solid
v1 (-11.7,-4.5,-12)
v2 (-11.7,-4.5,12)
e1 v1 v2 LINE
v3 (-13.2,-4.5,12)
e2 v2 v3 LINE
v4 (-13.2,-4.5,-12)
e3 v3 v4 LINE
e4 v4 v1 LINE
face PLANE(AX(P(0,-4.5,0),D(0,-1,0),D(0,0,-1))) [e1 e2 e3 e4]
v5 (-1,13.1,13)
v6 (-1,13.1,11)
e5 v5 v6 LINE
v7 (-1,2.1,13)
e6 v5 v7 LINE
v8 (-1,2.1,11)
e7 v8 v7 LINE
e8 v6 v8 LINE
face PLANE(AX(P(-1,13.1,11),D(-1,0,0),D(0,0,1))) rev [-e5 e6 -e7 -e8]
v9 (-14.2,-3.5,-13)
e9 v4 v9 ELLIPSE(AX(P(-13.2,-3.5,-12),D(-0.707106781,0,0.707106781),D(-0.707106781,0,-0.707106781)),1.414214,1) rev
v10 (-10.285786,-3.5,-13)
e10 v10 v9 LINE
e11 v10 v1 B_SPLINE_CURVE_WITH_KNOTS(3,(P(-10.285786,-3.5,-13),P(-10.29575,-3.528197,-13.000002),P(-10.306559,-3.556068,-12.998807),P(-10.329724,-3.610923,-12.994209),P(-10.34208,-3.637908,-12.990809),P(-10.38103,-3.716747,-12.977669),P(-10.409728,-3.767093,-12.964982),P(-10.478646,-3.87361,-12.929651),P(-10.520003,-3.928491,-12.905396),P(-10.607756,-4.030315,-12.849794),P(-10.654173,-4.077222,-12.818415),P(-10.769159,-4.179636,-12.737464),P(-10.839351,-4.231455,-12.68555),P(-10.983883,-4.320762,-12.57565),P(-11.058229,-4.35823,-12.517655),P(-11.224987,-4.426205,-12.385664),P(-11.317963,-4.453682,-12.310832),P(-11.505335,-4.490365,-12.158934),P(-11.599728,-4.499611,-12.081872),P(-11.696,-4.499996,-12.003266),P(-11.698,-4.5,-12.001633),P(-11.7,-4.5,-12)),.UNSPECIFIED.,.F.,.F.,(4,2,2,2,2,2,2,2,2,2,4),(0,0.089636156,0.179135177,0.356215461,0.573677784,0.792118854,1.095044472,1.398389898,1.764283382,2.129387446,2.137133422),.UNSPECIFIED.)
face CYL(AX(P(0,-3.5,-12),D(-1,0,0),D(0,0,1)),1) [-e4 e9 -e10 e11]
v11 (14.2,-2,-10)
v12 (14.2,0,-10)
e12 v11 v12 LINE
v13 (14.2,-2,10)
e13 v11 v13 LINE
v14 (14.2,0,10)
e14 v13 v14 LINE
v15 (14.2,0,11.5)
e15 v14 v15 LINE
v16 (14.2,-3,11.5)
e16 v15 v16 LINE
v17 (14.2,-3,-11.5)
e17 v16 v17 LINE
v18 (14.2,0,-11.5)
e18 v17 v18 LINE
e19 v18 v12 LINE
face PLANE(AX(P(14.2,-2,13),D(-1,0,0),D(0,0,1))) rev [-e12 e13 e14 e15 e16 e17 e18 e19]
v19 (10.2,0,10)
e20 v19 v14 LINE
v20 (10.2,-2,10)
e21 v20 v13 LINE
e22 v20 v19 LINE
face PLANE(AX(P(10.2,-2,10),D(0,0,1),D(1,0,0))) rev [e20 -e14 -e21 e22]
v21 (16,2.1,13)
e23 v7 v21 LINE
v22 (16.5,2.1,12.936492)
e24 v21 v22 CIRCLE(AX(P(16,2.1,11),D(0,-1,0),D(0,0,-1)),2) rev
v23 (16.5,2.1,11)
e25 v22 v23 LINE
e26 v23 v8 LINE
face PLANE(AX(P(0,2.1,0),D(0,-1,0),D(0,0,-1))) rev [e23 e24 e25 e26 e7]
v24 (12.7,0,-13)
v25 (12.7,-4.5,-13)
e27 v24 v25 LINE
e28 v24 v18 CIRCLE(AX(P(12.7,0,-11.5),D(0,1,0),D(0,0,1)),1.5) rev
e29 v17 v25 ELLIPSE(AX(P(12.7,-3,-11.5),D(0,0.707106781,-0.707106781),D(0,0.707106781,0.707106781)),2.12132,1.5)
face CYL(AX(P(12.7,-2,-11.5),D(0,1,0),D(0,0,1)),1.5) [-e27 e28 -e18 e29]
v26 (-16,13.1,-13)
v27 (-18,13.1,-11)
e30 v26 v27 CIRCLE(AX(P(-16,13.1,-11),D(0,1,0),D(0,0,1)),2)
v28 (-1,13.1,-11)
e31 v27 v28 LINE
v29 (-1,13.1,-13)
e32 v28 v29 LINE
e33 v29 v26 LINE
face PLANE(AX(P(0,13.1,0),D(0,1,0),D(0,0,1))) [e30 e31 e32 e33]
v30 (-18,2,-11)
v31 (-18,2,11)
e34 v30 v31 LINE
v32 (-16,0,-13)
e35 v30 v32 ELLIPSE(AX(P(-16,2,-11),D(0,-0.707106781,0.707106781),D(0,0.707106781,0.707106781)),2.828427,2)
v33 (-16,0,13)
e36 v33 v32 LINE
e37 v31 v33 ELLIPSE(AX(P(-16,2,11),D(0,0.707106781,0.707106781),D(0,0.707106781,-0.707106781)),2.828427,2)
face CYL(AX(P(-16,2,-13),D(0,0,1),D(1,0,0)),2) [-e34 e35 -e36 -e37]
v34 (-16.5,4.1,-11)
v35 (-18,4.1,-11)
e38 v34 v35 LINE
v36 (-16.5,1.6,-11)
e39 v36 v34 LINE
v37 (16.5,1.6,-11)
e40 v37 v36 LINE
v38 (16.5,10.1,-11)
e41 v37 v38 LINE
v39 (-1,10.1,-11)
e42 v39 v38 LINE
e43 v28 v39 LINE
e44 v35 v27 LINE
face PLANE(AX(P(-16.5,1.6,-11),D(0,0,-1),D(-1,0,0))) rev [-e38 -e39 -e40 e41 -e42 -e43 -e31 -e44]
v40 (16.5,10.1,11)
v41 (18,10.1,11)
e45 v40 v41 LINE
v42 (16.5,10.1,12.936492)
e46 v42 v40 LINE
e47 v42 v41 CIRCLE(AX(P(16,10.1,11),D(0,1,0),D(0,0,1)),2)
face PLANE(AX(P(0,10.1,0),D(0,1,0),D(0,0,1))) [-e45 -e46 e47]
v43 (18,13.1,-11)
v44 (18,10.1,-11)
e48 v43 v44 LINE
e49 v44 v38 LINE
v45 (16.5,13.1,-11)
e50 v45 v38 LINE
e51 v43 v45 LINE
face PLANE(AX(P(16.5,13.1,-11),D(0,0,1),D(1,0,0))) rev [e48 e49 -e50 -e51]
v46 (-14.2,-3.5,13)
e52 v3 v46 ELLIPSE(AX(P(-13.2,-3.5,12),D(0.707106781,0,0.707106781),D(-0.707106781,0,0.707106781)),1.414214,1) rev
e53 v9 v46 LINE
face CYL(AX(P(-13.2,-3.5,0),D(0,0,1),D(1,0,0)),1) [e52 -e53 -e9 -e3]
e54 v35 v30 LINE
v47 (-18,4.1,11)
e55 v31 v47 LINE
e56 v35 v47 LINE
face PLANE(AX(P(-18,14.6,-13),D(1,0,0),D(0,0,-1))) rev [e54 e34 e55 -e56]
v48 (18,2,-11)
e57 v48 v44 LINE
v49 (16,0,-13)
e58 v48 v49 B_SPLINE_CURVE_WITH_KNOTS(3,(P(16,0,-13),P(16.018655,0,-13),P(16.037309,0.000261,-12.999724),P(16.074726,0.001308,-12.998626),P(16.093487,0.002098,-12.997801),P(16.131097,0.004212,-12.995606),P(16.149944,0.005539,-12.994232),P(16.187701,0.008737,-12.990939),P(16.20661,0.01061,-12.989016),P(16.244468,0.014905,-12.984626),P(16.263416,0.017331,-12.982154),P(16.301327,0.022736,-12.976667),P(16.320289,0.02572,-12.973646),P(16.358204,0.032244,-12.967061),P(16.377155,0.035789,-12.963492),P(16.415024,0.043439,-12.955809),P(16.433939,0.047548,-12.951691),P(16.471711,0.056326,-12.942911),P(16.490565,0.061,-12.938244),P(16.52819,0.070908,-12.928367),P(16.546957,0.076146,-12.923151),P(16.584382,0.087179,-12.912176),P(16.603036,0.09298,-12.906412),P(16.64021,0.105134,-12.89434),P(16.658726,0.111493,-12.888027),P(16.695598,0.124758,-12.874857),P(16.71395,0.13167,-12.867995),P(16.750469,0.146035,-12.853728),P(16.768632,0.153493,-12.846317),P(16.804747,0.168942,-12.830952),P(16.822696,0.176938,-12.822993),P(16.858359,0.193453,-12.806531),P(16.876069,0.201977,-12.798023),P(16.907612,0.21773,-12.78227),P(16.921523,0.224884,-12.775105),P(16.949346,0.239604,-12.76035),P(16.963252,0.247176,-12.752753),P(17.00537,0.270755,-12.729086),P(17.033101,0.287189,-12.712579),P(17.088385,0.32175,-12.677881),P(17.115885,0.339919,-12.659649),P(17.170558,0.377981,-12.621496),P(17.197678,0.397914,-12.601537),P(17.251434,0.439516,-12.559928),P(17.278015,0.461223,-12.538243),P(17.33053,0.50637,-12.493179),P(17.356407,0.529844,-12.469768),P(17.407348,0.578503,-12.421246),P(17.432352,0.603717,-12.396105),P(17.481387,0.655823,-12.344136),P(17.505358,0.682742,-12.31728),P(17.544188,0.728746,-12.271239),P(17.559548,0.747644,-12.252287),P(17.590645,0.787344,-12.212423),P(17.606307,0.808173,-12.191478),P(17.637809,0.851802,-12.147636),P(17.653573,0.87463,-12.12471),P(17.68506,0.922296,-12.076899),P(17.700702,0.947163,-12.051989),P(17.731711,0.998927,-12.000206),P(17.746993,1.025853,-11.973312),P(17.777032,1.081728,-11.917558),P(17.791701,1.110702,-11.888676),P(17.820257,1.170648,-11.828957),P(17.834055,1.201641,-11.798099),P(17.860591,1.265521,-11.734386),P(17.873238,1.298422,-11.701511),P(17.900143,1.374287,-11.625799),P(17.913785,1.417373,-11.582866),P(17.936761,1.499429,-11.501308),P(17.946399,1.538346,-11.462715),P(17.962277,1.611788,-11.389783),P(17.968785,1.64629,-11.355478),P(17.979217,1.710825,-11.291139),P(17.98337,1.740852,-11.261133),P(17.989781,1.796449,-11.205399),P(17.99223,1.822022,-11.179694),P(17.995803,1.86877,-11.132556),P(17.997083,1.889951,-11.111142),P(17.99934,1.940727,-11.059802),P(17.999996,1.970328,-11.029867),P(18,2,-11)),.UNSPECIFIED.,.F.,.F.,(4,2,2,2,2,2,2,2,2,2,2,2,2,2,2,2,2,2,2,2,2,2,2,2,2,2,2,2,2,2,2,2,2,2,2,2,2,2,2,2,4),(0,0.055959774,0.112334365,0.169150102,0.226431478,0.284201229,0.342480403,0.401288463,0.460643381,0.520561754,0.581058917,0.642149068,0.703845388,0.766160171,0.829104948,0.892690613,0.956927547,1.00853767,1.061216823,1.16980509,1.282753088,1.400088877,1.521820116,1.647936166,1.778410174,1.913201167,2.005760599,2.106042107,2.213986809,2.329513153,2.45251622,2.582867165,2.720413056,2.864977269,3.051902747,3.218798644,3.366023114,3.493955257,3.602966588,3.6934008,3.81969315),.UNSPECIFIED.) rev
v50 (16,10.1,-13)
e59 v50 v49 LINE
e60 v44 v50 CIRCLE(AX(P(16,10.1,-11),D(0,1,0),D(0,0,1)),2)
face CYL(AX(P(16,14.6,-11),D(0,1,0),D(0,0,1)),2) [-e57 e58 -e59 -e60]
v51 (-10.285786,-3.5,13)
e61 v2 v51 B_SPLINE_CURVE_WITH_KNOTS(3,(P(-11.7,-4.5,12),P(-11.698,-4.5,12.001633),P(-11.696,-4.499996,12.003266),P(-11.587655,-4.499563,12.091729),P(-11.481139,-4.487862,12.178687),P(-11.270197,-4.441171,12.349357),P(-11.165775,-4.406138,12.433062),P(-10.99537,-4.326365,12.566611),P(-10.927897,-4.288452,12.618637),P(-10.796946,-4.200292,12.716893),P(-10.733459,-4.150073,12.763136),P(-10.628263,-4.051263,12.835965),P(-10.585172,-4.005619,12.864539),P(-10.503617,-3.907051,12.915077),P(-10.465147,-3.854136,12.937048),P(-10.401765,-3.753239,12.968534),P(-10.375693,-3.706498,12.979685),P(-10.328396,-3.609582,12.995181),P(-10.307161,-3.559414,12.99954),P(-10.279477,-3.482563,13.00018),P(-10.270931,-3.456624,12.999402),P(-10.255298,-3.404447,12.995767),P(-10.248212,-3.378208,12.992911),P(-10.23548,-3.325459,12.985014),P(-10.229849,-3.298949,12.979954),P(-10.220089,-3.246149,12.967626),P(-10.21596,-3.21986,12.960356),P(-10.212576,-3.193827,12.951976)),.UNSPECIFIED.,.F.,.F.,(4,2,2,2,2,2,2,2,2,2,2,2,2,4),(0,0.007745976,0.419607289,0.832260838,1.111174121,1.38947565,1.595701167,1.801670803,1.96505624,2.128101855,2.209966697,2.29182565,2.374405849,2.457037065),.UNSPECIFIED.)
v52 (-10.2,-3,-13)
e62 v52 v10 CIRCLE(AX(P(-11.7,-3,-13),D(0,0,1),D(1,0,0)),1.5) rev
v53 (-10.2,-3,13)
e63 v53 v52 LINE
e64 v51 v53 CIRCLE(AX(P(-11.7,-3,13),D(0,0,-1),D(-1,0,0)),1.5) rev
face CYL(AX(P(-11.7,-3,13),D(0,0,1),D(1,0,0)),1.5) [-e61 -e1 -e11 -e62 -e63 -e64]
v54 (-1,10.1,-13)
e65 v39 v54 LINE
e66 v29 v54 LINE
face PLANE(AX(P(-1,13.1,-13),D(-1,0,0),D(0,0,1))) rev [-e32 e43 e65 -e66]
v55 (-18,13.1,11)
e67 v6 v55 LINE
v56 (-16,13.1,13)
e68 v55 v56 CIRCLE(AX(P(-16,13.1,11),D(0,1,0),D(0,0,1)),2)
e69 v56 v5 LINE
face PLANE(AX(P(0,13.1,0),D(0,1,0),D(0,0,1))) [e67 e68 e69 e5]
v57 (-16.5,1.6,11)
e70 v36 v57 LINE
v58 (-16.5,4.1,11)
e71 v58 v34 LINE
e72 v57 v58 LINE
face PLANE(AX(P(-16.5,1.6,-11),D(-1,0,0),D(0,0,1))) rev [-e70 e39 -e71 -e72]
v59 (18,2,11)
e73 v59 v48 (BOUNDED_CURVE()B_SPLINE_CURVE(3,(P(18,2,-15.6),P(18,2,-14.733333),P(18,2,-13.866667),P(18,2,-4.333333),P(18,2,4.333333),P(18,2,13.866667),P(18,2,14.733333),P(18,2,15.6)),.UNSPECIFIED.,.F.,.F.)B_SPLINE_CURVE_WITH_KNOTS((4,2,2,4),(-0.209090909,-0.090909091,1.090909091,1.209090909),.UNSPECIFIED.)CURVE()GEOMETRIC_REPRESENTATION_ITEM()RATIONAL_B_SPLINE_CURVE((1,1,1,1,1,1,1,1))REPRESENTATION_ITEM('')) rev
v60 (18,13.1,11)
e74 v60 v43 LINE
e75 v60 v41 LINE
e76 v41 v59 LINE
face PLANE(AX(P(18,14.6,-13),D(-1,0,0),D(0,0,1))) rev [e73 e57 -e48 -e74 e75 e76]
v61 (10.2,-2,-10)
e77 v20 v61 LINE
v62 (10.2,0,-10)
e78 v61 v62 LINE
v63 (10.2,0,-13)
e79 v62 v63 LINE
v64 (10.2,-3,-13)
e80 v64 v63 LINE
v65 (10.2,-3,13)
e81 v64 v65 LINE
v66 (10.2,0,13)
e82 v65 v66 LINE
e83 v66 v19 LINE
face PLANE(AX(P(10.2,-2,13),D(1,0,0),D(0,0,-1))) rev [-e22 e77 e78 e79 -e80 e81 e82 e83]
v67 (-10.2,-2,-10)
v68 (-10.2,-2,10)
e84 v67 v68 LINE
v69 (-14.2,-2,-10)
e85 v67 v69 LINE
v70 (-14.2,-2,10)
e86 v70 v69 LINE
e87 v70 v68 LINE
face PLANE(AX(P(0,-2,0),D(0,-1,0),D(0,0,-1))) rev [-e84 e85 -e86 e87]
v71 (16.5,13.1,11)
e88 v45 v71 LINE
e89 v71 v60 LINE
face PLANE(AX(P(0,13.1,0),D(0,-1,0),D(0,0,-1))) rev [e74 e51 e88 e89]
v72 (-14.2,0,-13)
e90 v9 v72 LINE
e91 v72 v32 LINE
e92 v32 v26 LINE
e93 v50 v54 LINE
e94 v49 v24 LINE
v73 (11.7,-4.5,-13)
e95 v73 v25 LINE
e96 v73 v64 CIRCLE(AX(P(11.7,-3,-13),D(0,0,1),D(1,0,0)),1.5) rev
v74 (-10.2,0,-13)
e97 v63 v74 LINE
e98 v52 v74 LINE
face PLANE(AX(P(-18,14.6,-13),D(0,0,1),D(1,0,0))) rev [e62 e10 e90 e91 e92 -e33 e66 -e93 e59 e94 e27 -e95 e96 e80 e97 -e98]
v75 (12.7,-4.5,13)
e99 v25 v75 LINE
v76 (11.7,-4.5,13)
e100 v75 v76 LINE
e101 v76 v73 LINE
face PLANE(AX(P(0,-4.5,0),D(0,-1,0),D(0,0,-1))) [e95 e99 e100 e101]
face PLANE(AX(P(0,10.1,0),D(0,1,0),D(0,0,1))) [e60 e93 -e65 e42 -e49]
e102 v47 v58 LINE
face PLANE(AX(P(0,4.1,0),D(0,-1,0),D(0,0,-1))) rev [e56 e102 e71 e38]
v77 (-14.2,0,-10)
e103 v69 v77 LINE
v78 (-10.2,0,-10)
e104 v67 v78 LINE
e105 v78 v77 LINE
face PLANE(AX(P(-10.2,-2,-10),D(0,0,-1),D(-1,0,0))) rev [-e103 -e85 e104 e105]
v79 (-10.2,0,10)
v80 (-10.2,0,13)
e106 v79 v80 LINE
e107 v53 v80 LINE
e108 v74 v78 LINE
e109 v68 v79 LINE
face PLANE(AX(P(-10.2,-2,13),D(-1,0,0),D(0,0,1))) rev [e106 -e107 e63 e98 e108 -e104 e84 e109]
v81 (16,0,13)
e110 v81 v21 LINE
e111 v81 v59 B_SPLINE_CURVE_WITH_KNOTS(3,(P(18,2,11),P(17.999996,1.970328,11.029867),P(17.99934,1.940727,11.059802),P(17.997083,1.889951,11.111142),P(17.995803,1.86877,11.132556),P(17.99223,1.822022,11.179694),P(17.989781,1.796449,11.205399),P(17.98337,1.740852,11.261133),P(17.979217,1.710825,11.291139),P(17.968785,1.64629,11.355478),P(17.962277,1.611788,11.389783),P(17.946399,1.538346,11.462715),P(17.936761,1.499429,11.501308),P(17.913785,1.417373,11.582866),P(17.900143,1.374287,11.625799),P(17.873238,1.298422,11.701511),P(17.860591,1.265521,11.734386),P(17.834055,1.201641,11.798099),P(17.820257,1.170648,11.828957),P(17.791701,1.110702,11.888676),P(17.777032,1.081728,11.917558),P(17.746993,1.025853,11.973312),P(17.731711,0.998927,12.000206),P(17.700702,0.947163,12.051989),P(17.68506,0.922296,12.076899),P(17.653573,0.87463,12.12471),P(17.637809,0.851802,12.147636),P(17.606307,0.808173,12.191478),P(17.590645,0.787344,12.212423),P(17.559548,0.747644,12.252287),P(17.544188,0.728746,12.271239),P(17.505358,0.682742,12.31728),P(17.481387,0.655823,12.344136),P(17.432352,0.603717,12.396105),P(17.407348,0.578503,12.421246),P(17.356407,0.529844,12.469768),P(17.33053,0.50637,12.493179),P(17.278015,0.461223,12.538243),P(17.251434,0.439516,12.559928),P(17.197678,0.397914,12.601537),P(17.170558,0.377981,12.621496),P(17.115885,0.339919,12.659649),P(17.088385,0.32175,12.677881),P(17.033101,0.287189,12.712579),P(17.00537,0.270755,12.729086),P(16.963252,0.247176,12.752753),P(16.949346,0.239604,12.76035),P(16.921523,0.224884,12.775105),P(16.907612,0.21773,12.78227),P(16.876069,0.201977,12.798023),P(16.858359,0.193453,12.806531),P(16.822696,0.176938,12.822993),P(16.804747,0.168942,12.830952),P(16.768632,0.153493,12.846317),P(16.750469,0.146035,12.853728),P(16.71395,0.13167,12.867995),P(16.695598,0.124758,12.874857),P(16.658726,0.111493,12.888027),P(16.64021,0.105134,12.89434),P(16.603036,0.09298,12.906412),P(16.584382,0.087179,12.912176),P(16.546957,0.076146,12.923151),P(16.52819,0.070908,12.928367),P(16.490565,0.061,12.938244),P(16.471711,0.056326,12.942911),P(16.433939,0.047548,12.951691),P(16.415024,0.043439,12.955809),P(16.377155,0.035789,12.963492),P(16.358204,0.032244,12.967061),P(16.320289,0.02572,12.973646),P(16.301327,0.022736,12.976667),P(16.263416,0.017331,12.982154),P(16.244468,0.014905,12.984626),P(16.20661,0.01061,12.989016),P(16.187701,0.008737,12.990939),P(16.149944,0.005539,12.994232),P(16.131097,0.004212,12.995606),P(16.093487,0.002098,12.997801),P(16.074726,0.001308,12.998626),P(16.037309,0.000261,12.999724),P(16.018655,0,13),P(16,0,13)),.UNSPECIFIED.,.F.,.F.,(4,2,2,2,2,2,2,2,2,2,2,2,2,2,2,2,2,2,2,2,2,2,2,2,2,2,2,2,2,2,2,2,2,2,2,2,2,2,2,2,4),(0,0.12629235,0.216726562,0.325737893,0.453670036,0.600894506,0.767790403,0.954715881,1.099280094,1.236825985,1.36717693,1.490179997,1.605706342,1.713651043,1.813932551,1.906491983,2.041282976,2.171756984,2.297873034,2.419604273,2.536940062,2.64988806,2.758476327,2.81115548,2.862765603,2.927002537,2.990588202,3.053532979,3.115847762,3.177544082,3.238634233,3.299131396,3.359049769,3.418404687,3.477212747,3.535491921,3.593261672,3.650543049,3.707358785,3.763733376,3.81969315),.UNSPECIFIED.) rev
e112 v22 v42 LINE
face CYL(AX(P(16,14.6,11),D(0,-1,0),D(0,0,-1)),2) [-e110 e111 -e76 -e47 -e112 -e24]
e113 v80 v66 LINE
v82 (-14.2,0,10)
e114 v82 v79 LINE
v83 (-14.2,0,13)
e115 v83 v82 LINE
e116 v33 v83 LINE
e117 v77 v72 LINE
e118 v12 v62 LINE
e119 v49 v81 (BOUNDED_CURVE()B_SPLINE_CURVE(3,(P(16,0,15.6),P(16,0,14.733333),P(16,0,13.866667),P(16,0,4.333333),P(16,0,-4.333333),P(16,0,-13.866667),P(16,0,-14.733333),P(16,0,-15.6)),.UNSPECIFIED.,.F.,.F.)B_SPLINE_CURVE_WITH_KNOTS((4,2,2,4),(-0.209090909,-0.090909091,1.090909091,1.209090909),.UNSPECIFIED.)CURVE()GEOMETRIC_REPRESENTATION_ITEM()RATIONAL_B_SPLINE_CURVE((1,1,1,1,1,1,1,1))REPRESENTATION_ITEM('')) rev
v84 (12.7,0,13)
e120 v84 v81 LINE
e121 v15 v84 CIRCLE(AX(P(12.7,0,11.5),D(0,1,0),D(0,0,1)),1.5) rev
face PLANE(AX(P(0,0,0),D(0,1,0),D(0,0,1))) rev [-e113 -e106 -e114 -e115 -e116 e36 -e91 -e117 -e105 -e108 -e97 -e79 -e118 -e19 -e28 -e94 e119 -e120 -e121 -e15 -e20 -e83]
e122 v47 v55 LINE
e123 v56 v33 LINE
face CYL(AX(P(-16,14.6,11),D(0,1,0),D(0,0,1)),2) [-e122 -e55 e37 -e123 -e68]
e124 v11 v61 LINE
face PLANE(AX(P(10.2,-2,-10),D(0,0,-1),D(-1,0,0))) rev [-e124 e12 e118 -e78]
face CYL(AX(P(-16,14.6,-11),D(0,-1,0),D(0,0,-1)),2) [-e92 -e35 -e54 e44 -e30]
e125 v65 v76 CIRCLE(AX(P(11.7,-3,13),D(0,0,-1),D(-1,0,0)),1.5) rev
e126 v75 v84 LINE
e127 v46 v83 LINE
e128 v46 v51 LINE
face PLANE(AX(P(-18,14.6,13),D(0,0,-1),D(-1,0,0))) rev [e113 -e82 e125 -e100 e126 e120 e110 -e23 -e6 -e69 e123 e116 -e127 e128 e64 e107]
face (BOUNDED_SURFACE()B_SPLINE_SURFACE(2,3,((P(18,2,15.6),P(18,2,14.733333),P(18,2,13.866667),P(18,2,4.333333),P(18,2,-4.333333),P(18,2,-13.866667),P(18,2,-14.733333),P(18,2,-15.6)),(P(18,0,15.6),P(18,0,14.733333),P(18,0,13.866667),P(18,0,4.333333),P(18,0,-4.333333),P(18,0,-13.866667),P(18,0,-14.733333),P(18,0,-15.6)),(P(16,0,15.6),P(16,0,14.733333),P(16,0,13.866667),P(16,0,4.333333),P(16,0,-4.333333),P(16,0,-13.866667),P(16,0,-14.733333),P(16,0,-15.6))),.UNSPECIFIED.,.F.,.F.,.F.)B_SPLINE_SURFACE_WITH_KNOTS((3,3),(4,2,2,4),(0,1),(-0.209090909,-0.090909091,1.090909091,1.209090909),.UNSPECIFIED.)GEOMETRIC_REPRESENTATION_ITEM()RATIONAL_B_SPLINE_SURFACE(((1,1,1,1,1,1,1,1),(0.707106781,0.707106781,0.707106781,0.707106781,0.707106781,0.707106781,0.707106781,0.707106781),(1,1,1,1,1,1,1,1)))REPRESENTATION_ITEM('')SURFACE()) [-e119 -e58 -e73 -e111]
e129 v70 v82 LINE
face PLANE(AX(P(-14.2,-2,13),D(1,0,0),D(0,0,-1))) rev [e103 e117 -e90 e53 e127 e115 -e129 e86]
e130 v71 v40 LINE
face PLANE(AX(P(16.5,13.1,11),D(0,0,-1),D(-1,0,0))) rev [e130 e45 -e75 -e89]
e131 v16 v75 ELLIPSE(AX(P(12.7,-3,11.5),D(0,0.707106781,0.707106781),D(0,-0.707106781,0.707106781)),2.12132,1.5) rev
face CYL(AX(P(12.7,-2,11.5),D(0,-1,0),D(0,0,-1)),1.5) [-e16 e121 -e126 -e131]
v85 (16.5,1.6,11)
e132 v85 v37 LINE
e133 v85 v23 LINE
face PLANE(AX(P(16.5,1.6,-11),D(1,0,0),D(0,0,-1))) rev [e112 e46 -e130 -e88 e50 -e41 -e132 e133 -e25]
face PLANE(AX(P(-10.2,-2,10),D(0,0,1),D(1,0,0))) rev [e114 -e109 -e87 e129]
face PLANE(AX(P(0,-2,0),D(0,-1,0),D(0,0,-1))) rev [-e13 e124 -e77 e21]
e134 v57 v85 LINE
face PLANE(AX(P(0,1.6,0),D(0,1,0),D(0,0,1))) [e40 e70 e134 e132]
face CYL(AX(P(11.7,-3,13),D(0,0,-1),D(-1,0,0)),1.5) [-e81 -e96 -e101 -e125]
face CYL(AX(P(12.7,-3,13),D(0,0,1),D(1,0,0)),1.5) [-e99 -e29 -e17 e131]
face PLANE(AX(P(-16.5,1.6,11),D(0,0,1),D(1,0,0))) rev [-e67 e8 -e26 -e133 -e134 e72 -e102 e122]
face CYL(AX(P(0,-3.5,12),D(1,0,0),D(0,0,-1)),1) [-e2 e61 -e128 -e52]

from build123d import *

# Parameters (mm, degrees)
SKETCH_1_W          = 36
SKETCH_1_H          = 26
EXTRUDE_1_DEPTH     = 14.6
SKETCH_2_W          = 33
SKETCH_2_H          = 22
CUT_EXTRUDE_1_DEPTH = 13
SKETCH_3_W          = 36
SKETCH_3_H          = 26
CUT_EXTRUDE_2_DEPTH = 4.5
SKETCH_4_W          = 1.5
SKETCH_4_H          = 22
CUT_EXTRUDE_3_DEPTH = 6
SKETCH_7_W          = 17
SKETCH_7_H          = 2
SKETCH_7_W_2        = 1.5
SKETCH_7_H_2        = 22
EXTRUDE_4_DEPTH     = 3
SKETCH_5_W          = 4
SKETCH_5_H          = 3
EXTRUDE_5_DEPTH     = 2
SKETCH_8_W          = 4
SKETCH_8_H          = 26
EXTRUDE_6_DEPTH     = 2.5
SKETCH_10_W         = 17.5
SKETCH_10_H         = 2
CUT_EXTRUDE_4_DEPTH = 8
FILLET_2_R          = 1
FILLET_3_R          = 1.5
FILLET_4_R          = 1.5
FILLET_5_R          = 1.5
FILLET_6_R          = 2
FILLET_7_R          = 2
FILLET_8_R          = 2
FILLET_START        = -14
FILLET_9_DEPTH      = 28


with BuildPart() as part:
    # 草图1 → 凸台-拉伸1 (new body)
    with BuildSketch(Plane(origin=(0, 0, 0), x_dir=(1, 0, 0), z_dir=(0, 1, 0))):
        Rectangle(SKETCH_1_W, SKETCH_1_H)
    extrude(amount=EXTRUDE_1_DEPTH)

    # 草图2 → 切除-拉伸1 (cut)
    with BuildSketch(Plane(origin=(0, 14.6, 0), x_dir=(1, 0, 0), z_dir=(0, 1, 0))):
        Rectangle(SKETCH_2_W, SKETCH_2_H)
    extrude(amount=-CUT_EXTRUDE_1_DEPTH, mode=Mode.SUBTRACT)

    # 草图3 → 切除-拉伸2 (cut)
    with BuildSketch(Plane(origin=(0, 14.6, 0), x_dir=(1, 0, 0), z_dir=(0, 1, 0))):
        Rectangle(SKETCH_3_W, SKETCH_3_H)
    extrude(amount=-CUT_EXTRUDE_2_DEPTH, mode=Mode.SUBTRACT)

    # 草图4 → 切除-拉伸3 (cut)
    with BuildSketch(Plane(origin=(0, 10.1, 0), x_dir=(1, 0, 0), z_dir=(0, 1, 0))):
        with Locations((-17.25, 0)):
            Rectangle(SKETCH_4_W, SKETCH_4_H)
    extrude(amount=-CUT_EXTRUDE_3_DEPTH, mode=Mode.SUBTRACT)

    # 草图7 → 凸台-拉伸4 (add)
    with BuildSketch(Plane(origin=(0, 10.1, 0), x_dir=(1, 0, 0), z_dir=(0, 1, 0))):
        with Locations((-9.5, 12)):
            Rectangle(SKETCH_7_W, SKETCH_7_H)
        with Locations((-9.5, -12)):
            Rectangle(SKETCH_7_W, SKETCH_7_H)
        with Locations((17.25, 0)):
            Rectangle(SKETCH_7_W_2, SKETCH_7_H_2)
    extrude(amount=EXTRUDE_4_DEPTH)

    # 草图5 → 凸台-拉伸5 (add)
    with BuildSketch(Plane(origin=(0, 0, 0), x_dir=(-1, 0, 0), z_dir=(0, -1, 0))):
        with Locations((-12.2, -11.5)):
            Rectangle(SKETCH_5_W, SKETCH_5_H)
        with Locations((12.2, -11.5)):
            Rectangle(SKETCH_5_W, SKETCH_5_H)
        with Locations((-12.2, 11.5)):
            Rectangle(SKETCH_5_W, SKETCH_5_H)
        with Locations((12.2, 11.5)):
            Rectangle(SKETCH_5_W, SKETCH_5_H)
    extrude(amount=EXTRUDE_5_DEPTH)

    # 草图8 → 凸台-拉伸6 (add)
    with BuildSketch(Plane(origin=(0, -2, 0), x_dir=(-1, 0, 0), z_dir=(0, -1, 0))):
        with Locations((-12.2, 0)):
            Rectangle(SKETCH_8_W, SKETCH_8_H)
        with Locations((12.2, 0)):
            Rectangle(SKETCH_8_W, SKETCH_8_H)
    extrude(amount=EXTRUDE_6_DEPTH)

    # 草图10 → 切除-拉伸4 (cut)
    with BuildSketch(Plane(origin=(0, 10.1, 0), x_dir=(1, 0, 0), z_dir=(0, 1, 0))):
        with Locations((7.75, -12)):
            Rectangle(SKETCH_10_W, SKETCH_10_H)
    extrude(amount=-CUT_EXTRUDE_4_DEPTH, mode=Mode.SUBTRACT)

    # 圆角2
    fillet_2_edges = [part.edges().sort_by_distance(p)[0] for p in [
        (-14.2, -4.5, 0),
        (-12.2, -4.5, -13),
        (-12.2, -4.5, 13),
    ]]
    fillet(fillet_2_edges, radius=FILLET_2_R)

    # 圆角3
    fillet_3_edges = [part.edges().sort_by_distance(p)[0] for p in [
        (14.2, -2.25, 13),
        (14.2, -2.25, -13),
        (14.2, -4.5, 0),
    ]]
    fillet(fillet_3_edges, radius=FILLET_3_R)

    # 圆角4
    fillet_4_edges = [part.edges().sort_by_distance(p)[0] for p in [
        (10.2, -4.5, 0),
    ]]
    fillet(fillet_4_edges, radius=FILLET_4_R)

    # 圆角5
    # the kernel refuses this fillet: 1.5 mm, written as the material it takes off along each edge
    with BuildSketch(Plane(origin=(-10.2, -4.5, 15.75), x_dir=(0, 1, 0), z_dir=(0, 0, -1))) as fillet_5_piece_1:
        with BuildLine():
            CenterArc((FILLET_5_R, -FILLET_5_R), FILLET_5_R, 90, 90)
            Line((0, -FILLET_5_R), (0, 0))
            Line((0, 0), (FILLET_5_R, 0))
        make_face()
    extrude(amount=31.5, mode=Mode.SUBTRACT)

    # 圆角6
    fillet_6_edges = [part.edges().sort_by_distance(p)[0] for p in [
        (-18, 6.55, 13),
        (-18, 6.55, -13),
        (-18, 0, 0),
    ]]
    fillet(fillet_6_edges, radius=FILLET_6_R)

    # 圆角7
    fillet_7_edges = [part.edges().sort_by_distance(p)[0] for p in [
        (18, 5.05, -13),
    ]]
    fillet(fillet_7_edges, radius=FILLET_7_R)

    # 圆角8
    fillet_8_edges = [part.edges().sort_by_distance(p)[0] for p in [
        (18, 5.05, 13),
    ]]
    fillet(fillet_8_edges, radius=FILLET_8_R)

    # 圆角9: read off the stored shape, not the designer's step
    # 圆角9 outline → 圆角9 (cut)
    with BuildSketch(Plane.XY.offset(FILLET_START)):
        with BuildLine():
            Line((18, 0), (18, 2))
            add(Edge.make_bspline(
                [(18, 2), (18, 0), (16, 0)],
                knots=[0, 0, 0, 1, 1, 1], degree=2, weights=[1, 0.707106781, 1]))
            Line((16, 0), (18, 0))
        make_face()
    extrude(amount=FILLET_9_DEPTH, mode=Mode.SUBTRACT)


solid = part.part
